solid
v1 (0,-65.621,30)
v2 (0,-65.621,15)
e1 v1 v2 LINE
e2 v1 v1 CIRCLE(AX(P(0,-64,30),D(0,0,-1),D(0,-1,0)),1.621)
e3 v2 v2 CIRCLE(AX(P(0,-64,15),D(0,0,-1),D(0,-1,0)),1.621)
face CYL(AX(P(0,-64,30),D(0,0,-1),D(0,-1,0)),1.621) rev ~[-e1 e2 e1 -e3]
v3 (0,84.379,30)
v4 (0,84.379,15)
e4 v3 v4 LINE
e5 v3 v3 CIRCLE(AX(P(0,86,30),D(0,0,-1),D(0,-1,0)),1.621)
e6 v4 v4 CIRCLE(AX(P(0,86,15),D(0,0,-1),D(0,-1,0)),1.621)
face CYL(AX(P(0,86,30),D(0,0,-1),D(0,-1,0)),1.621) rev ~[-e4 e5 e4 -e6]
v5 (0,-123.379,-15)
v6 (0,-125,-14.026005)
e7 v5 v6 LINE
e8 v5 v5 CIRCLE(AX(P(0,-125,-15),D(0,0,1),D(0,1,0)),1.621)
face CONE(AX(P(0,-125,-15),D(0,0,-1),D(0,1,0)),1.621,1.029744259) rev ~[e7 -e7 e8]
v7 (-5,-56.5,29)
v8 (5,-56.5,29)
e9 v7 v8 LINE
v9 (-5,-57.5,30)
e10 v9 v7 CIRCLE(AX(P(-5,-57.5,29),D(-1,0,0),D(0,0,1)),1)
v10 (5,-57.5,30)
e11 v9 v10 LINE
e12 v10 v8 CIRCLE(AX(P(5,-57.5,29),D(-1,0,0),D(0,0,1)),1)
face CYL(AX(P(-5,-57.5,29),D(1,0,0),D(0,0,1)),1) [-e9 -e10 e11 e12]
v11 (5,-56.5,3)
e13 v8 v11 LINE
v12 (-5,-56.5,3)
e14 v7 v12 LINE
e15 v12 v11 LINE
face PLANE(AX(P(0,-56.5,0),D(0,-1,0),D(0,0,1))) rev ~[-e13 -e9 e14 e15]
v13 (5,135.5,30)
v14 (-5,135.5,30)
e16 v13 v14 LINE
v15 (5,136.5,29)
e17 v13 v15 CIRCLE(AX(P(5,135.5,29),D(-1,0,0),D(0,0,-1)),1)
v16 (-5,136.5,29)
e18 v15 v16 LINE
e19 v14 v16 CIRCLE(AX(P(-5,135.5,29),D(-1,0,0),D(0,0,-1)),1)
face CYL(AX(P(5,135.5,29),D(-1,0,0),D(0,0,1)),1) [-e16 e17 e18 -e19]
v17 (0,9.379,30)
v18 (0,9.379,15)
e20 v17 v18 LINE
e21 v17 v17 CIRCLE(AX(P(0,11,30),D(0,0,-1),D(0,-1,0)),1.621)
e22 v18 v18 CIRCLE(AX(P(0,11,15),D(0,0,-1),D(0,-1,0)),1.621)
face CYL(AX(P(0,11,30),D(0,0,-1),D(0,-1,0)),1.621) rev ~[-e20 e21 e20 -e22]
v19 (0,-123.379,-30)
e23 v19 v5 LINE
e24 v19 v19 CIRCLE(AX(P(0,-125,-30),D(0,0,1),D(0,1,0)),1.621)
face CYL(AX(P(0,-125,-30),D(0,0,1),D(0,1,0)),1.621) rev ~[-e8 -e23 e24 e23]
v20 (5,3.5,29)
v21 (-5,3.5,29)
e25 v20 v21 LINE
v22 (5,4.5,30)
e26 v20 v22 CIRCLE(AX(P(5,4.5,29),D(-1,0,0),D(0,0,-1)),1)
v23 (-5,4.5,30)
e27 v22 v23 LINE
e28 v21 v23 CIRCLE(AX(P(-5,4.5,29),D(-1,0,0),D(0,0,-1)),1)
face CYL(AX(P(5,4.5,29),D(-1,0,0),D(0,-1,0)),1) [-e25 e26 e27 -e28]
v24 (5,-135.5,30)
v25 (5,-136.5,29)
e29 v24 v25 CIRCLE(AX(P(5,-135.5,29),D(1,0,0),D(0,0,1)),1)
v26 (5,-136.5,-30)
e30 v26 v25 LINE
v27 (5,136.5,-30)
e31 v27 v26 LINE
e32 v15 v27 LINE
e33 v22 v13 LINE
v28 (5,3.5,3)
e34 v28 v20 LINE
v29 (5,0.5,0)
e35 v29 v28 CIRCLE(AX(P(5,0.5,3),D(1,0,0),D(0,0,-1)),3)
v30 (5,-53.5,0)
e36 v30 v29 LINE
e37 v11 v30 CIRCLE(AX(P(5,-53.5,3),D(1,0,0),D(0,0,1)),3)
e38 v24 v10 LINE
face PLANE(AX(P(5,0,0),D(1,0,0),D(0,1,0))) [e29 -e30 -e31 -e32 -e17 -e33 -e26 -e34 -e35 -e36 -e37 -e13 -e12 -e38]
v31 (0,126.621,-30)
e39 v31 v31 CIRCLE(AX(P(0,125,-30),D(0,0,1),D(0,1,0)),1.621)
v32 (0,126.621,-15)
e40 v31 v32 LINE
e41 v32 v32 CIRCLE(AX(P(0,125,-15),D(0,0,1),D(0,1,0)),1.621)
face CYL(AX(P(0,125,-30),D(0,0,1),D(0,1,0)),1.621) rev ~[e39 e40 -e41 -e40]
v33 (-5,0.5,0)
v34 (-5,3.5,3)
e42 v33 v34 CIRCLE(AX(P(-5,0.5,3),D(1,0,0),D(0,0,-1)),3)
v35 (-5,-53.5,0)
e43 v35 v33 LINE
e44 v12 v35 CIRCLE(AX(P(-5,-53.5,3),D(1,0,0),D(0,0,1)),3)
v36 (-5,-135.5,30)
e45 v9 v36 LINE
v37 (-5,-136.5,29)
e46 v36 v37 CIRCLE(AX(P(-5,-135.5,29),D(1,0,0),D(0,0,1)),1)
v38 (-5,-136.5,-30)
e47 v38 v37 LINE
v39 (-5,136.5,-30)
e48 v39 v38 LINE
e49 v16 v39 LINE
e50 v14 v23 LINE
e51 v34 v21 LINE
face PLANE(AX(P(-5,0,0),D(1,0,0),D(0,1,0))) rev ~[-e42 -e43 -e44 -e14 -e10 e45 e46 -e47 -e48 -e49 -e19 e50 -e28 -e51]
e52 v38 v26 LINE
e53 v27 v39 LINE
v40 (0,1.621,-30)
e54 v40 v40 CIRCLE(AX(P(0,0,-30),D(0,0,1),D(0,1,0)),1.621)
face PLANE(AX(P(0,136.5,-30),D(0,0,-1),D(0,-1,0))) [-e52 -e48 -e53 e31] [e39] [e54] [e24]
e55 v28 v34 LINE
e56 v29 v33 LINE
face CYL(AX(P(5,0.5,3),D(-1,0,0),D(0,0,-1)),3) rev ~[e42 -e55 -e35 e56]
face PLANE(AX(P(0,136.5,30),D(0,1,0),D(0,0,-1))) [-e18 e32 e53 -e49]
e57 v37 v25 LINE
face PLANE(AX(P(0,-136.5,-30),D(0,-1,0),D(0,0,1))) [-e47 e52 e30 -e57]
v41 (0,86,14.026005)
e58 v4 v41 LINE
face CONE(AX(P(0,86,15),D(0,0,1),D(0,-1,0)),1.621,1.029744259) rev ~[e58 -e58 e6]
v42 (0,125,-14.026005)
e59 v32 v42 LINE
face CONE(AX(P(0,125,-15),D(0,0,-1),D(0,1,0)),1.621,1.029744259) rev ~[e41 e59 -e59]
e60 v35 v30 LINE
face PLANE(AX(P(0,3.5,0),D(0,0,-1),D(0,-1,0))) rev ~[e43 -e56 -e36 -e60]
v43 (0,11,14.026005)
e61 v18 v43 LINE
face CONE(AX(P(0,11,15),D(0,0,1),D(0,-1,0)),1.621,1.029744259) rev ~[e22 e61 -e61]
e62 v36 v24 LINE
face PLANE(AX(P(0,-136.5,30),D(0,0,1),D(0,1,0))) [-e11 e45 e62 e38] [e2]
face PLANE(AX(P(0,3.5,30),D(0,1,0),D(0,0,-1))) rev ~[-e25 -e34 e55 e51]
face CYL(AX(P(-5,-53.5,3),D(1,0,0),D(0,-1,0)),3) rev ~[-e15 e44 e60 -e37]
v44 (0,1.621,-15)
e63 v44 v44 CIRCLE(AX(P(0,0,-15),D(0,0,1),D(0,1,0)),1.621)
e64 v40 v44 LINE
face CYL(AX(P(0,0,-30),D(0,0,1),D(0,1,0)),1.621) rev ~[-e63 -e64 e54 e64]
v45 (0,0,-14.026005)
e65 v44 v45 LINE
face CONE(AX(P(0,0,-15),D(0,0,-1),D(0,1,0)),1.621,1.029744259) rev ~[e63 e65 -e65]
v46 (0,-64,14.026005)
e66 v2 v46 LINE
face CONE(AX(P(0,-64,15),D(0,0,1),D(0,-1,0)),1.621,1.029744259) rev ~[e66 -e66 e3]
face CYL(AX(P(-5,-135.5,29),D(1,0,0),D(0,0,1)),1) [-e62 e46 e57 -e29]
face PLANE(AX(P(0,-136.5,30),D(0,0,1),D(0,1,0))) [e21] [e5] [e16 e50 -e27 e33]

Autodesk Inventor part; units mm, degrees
ref_plane "YZ Plane" through (0, 0, 0) normal (1, 0, 0) x (0, 1, 0)
ref_plane "XZ Plane" through (0, 0, 0) normal (0, 1, 0) x (-1, 0, 0)
ref_plane "XY Plane" through (0, 0, 0) normal (0, 0, 1) x (1, 0, 0)
sketch "Sketch1" plane through (0, 0, 0) normal (1, 0, 0) x (0, 1, 0)
  line L0 (-191.1, 0) -> (191.1, 0) construction
  line L1 (0, -46) -> (0, 66) construction
  line L2 (-136.5, 30) -> (136.5, 30)
  line L3 (136.5, 30) -> (136.5, -30)
  line L4 (136.5, -30) -> (-136.5, -30)
  line L5 (-136.5, -30) -> (-136.5, 30)
  line L6 (105.4423, 30) -> (136.5, 50)
  line L7 (136.5, 50) -> (136.5, 30)
  circle A0 centre (133.5, 44.4999) radius 3
  circle A1 centre (115.5, 32.9086) radius 3
  line L8 (-136.5, 30) -> (103.5, 30) construction
  line L9 (103.5, 30) -> (103.5, 38) construction
  line L10 (103.5, 38) -> (-136.5, 38) construction
  line L11 (-136.5, 38) -> (-136.5, 30) construction
  line L12 (112.5, 34.5449) -> (112.5, 30)
  circle A2 centre (109.5, 30) radius 3
  circle A3 centre (109.5, 33) radius 3
  line L13 (-56.5, 30) -> (3.5, 30)
  line L14 (3.5, 30) -> (3.5, 0)
  line L15 (3.5, 0) -> (-56.5, 0)
  line L16 (-56.5, 0) -> (-56.5, 30)
  line L17 (-26.5, 0) -> (-26.5, 30) construction
  point P0 (0, 0)
  point P1 (106.5, 30)
  dimension "d6" = 6
  dimension "d1" = 32.78
  dimension "d2" = 6
  dimension "d3" = 8
  dimension "d4" = 240
  dimension "d7" = 60
  dimension "d35" = 147.22
  dimension "d36" = 273
  dimension "d37" = 20
  dimension "d38" = 24
  dimension "d39" = 110
  dimension "d40" = 60
  dimension "d41" = 30
extrude "Extrusion1" add sketch "Sketch1" along normal mid plane 10 contours L2 L16 L15 L14 A2 A1 L3 L4 L5 | L2 L14 L15 L16 | L2 A2 | A1 L2 picked at (115.4176, 29.9729)
extrude "Extrusion2" cut sketch "Sketch1" along normal through all both and the other way through all contours L2 L14 L15 L16
sketch "Sketch2" plane through (-5, -136.5, 30) normal (0, 0, 1) x (1, 0, 0)
  line L0 (5, -54.6) -> (5, 327.6) construction
  line L1 (0, 0) -> (10, 0) projected
  point P0 (5, 136.5)
  point P1 (5, 72.5)
  point P2 (5, 147.5)
  point P3 (5, 222.5)
  dimension "d11" = 72.5
  dimension "d12" = 75
  dimension "d13" = 75
hole "Hole1" at (0, -64, 30) at (0, 11, 30) at (0, 86, 30) direction (0, 0, -1) diameter 3.242 depth 15 tip angle 118 thread size "M4x0.7" class "6H" standard "ISO Metric profile"
sketch "Sketch3" plane through (5, 136.5, -30) normal (0, 0, -1) x (-1, 0, 0)
  line L0 (12, -136.5) -> (-2, -136.5) construction
  line L1 (5, -327.6) -> (5, 54.6) construction
  point P0 (5, -136.5)
  point P1 (5, -261.5)
  point P2 (5, -136.5)
  point P3 (5, -11.5)
  dimension "d21" = 250
hole "Hole2" at (0, -125, -30) at (0, 0, -30) at (0, 125, -30) direction (0, 0, 1) diameter 3.242 depth 15 tip angle 118 thread size "M4x0.7" class "6H" standard "ISO Metric profile"
fillet "Fillet1" radius 3 2 edges at (0, -56.5, 0) (0, 3.5, 0)
fillet "Fillet1" radius 1 4 edges at (0, -56.5, 30) (0, 3.5, 30) (0, -136.5, 30) (0, 136.5, 30)
properties part number "GRJ-04-103" material "Fenolite OR"
